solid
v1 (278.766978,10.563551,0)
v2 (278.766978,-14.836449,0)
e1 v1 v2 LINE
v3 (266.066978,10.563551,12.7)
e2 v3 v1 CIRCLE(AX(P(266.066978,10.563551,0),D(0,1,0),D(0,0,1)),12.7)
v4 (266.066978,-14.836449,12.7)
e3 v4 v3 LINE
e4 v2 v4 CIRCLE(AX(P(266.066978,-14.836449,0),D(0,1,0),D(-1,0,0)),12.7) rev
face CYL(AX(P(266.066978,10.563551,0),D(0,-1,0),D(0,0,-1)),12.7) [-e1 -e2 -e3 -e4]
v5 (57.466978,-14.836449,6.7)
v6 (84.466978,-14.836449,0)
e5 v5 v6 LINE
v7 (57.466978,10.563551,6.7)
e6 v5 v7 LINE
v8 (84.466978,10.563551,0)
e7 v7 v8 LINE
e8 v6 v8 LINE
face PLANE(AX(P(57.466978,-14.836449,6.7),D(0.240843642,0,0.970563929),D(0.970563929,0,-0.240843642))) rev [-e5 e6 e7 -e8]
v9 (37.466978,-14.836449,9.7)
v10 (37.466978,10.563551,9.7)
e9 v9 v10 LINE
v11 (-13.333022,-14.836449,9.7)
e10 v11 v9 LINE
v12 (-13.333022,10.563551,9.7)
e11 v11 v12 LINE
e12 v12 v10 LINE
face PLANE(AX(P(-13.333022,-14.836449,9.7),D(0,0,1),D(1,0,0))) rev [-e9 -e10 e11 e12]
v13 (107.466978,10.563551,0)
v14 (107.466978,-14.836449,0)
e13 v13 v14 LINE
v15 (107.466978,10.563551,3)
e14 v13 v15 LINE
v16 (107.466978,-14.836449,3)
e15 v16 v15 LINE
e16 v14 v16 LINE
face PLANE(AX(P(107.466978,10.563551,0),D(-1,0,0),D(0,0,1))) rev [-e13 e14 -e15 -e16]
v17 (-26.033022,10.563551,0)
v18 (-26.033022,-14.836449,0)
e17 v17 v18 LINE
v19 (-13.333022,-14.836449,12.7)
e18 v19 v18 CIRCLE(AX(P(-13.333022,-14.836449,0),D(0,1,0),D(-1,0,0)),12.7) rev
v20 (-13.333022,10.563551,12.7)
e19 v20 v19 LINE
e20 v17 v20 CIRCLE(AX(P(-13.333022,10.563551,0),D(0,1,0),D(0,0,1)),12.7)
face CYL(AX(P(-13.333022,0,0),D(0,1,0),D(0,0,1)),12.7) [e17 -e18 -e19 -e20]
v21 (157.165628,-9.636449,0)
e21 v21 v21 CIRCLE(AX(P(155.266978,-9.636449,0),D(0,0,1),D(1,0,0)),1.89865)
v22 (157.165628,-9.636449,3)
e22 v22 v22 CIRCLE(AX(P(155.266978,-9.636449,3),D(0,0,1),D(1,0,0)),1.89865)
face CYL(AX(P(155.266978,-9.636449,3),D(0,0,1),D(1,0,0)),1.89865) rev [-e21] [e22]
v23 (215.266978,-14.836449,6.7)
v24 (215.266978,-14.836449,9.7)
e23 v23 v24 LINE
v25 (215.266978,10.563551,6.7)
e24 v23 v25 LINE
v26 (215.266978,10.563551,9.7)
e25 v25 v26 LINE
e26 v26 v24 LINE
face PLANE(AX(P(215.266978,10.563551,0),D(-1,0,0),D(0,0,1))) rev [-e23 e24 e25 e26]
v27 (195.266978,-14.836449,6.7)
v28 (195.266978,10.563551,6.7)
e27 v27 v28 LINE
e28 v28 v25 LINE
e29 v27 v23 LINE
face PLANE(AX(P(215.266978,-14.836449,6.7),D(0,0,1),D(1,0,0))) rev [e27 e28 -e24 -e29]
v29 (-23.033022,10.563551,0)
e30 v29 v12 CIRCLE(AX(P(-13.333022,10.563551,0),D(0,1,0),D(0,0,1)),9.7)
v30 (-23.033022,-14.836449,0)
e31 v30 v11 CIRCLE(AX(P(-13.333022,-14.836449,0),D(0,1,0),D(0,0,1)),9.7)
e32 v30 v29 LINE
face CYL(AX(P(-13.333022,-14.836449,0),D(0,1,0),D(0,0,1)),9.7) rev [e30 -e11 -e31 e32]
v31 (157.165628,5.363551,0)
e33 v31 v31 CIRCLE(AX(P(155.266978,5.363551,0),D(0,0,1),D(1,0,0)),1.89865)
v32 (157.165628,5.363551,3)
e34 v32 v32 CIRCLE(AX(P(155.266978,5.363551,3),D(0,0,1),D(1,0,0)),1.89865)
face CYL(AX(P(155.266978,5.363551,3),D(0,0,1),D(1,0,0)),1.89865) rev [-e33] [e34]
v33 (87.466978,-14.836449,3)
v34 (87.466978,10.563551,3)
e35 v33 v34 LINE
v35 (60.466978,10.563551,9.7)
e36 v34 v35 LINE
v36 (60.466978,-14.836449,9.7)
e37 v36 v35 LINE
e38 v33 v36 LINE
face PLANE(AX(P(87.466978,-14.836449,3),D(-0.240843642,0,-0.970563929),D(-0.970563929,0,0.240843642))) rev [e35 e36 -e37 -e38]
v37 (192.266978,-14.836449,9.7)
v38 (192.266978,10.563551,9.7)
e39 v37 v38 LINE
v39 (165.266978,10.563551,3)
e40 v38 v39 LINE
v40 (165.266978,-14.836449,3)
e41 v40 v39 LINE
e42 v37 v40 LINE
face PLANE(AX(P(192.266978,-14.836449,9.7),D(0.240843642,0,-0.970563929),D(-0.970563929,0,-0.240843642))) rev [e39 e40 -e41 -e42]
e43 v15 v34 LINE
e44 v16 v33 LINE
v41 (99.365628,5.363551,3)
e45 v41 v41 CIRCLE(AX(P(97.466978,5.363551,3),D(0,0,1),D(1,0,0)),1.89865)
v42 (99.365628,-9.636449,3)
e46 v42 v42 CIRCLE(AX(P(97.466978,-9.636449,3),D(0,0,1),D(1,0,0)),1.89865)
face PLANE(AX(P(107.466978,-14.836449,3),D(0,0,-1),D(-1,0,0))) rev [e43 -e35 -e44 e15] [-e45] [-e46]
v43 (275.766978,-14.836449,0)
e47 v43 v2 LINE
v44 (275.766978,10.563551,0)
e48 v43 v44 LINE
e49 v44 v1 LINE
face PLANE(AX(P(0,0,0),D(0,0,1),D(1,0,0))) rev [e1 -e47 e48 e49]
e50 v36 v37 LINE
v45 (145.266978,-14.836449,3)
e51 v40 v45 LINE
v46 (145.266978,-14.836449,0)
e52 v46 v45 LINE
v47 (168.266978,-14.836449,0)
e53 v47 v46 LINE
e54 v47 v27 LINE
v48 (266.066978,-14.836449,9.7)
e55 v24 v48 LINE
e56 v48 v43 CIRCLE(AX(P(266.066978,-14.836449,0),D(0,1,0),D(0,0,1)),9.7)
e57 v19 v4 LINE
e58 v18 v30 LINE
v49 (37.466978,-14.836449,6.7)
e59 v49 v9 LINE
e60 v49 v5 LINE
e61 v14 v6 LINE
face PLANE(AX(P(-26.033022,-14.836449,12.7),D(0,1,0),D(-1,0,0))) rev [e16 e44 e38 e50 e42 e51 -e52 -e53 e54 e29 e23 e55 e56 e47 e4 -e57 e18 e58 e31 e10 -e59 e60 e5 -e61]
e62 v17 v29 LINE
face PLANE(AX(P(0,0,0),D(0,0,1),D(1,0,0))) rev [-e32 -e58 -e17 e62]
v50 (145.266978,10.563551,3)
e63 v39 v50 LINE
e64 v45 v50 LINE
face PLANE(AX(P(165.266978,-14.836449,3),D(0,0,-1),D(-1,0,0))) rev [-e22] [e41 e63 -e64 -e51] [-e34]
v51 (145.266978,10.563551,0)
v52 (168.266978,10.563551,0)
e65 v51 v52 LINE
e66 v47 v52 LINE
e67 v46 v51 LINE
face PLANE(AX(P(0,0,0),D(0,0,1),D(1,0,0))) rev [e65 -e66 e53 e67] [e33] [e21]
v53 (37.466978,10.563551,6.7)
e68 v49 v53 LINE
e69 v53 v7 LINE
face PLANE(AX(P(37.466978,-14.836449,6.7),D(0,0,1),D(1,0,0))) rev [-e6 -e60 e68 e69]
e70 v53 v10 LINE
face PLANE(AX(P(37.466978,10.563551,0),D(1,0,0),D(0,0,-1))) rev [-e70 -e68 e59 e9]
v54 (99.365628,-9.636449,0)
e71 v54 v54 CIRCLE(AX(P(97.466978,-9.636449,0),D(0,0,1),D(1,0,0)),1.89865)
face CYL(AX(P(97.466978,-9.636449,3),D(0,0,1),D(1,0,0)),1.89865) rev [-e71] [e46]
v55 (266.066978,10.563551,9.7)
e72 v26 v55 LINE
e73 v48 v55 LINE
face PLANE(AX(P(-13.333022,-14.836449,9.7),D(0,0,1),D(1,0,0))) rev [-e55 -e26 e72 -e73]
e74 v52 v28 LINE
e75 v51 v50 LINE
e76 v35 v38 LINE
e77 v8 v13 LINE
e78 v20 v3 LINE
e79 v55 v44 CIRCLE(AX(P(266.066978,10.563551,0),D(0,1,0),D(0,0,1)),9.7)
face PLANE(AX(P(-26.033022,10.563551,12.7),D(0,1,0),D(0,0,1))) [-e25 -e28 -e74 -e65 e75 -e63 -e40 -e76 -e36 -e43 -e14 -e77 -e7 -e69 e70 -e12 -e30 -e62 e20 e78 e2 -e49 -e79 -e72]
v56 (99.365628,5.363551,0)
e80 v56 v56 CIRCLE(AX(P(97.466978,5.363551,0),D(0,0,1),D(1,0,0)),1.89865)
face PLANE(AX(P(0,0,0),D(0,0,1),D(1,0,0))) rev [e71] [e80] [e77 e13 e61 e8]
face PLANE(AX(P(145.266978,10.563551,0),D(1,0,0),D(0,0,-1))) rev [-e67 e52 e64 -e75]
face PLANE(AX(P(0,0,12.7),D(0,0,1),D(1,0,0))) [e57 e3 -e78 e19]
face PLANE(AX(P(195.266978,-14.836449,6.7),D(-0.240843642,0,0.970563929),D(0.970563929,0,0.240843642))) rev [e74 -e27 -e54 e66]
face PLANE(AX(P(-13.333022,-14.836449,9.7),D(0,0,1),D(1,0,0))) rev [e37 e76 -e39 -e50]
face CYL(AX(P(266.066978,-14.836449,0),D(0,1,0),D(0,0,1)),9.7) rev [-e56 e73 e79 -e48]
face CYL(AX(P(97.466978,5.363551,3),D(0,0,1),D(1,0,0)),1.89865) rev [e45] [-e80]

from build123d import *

# Parameters (mm, degrees)
SKETCH1_W                 = 304.8
SKETCH1_H                 = 25.4
BOSS_EXTRUDE2_DEPTH       = 12.7
FILLET1_R                 = 12.7
CUT_EXTRUDE3_DEPTH        = 281.209703849
SKETCH8_W                 = 70
SKETCH8_H                 = 25.4
BOSS_EXTRUDE3_DEPTH       = 9.7
CUT_EXTRUDE4_DEPTH        = 281.209703849
CUT_EXTRUDE5_DEPTH        = 281.209703849
F_6_CLEARANCE_HOLE1_D     = 3.7973
F_6_CLEARANCE_HOLE1_DEPTH = 3


with BuildPart() as part:
    # Sketch1 → Boss-Extrude2 (new body)
    with BuildSketch(Plane.XY):
        with Locations((126.366978193, -2.136448598)):
            Rectangle(SKETCH1_W, SKETCH1_H)
    extrude(amount=BOSS_EXTRUDE2_DEPTH)

    # Fillet1
    fillet1_edges = [part.edges().sort_by_distance(p)[0] for p in [
        (-26.033021807, -2.136448598, 12.7),
        (278.766978193, -2.136448598, 12.7),
    ]]
    fillet(fillet1_edges, radius=FILLET1_R - 0.0001)  # a hair under: the kernel refuses the full size

    # Sketch6 → Cut-Extrude3 (cut, through all)
    with BuildSketch(Plane(origin=(0, 10.563551402, 0), x_dir=(1, 0, 0), z_dir=(0, 1, 0))):
        with BuildLine():
            Line((-23.033021807, 0), (275.766978193, 0))
            ThreePointArc((275.766978193, 0), (272.925913971, -6.858935778), (266.066978193, -9.7))
            Line((266.066978193, -9.7), (-13.333021807, -9.7))
            ThreePointArc((-13.333021807, -9.7), (-20.191957584, -6.858935778), (-23.033021807, 0))
        make_face()
    extrude(amount=-CUT_EXTRUDE3_DEPTH, mode=Mode.SUBTRACT)

    # Sketch8 → Boss-Extrude3 (add)
    with BuildSketch(Plane(origin=(0, 0, 9.7), x_dir=(-1, 0, 0), z_dir=(0, 0, -1))):
        with Locations((-180.266978193, -2.136448598)):
            Rectangle(SKETCH8_W, SKETCH8_H)
        with Locations((-72.466978193, -2.136448598)):
            Rectangle(SKETCH8_W, SKETCH8_H)
    extrude(amount=BOSS_EXTRUDE3_DEPTH)

    # Sketch9 → Cut-Extrude4 (cut, through all)
    with BuildSketch(Plane(origin=(0, 10.563551402, 0), x_dir=(1, 0, 0), z_dir=(0, 1, 0))):
        Polygon((145.266978193, -9.7), (165.266978193, -9.7), (192.266978193, -9.7), (165.266978193, -3), (145.266978193, -3), align=None)
        Polygon((215.266978193, -6.7), (195.266978193, -6.7), (168.266978193, 0), (215.266978193, 0), align=None)
    extrude(amount=-CUT_EXTRUDE4_DEPTH, mode=Mode.SUBTRACT)

    # Sketch12 → Cut-Extrude5 (cut, through all)
    with BuildSketch(Plane(origin=(0, 10.563551402, 0), x_dir=(1, 0, 0), z_dir=(0, 1, 0))):
        Polygon((107.466978193, -9.7), (107.466978193, -3), (87.466978193, -3), (60.466978193, -9.7), align=None)
        Polygon((37.466978193, -6.7), (57.466978193, -6.7), (84.466978193, 0), (37.466978193, 0), align=None)
    extrude(amount=-CUT_EXTRUDE5_DEPTH, mode=Mode.SUBTRACT)

    # #6 Clearance Hole1
    with Locations(Plane.XY.offset(3)):
        with Locations((97.466978193, 5.363551402), (155.266978193, 5.363551402), (155.266978193, -9.636448598), (97.466978193, -9.636448598)):
            Hole(F_6_CLEARANCE_HOLE1_D / 2, depth=F_6_CLEARANCE_HOLE1_DEPTH)


solid = part.part
